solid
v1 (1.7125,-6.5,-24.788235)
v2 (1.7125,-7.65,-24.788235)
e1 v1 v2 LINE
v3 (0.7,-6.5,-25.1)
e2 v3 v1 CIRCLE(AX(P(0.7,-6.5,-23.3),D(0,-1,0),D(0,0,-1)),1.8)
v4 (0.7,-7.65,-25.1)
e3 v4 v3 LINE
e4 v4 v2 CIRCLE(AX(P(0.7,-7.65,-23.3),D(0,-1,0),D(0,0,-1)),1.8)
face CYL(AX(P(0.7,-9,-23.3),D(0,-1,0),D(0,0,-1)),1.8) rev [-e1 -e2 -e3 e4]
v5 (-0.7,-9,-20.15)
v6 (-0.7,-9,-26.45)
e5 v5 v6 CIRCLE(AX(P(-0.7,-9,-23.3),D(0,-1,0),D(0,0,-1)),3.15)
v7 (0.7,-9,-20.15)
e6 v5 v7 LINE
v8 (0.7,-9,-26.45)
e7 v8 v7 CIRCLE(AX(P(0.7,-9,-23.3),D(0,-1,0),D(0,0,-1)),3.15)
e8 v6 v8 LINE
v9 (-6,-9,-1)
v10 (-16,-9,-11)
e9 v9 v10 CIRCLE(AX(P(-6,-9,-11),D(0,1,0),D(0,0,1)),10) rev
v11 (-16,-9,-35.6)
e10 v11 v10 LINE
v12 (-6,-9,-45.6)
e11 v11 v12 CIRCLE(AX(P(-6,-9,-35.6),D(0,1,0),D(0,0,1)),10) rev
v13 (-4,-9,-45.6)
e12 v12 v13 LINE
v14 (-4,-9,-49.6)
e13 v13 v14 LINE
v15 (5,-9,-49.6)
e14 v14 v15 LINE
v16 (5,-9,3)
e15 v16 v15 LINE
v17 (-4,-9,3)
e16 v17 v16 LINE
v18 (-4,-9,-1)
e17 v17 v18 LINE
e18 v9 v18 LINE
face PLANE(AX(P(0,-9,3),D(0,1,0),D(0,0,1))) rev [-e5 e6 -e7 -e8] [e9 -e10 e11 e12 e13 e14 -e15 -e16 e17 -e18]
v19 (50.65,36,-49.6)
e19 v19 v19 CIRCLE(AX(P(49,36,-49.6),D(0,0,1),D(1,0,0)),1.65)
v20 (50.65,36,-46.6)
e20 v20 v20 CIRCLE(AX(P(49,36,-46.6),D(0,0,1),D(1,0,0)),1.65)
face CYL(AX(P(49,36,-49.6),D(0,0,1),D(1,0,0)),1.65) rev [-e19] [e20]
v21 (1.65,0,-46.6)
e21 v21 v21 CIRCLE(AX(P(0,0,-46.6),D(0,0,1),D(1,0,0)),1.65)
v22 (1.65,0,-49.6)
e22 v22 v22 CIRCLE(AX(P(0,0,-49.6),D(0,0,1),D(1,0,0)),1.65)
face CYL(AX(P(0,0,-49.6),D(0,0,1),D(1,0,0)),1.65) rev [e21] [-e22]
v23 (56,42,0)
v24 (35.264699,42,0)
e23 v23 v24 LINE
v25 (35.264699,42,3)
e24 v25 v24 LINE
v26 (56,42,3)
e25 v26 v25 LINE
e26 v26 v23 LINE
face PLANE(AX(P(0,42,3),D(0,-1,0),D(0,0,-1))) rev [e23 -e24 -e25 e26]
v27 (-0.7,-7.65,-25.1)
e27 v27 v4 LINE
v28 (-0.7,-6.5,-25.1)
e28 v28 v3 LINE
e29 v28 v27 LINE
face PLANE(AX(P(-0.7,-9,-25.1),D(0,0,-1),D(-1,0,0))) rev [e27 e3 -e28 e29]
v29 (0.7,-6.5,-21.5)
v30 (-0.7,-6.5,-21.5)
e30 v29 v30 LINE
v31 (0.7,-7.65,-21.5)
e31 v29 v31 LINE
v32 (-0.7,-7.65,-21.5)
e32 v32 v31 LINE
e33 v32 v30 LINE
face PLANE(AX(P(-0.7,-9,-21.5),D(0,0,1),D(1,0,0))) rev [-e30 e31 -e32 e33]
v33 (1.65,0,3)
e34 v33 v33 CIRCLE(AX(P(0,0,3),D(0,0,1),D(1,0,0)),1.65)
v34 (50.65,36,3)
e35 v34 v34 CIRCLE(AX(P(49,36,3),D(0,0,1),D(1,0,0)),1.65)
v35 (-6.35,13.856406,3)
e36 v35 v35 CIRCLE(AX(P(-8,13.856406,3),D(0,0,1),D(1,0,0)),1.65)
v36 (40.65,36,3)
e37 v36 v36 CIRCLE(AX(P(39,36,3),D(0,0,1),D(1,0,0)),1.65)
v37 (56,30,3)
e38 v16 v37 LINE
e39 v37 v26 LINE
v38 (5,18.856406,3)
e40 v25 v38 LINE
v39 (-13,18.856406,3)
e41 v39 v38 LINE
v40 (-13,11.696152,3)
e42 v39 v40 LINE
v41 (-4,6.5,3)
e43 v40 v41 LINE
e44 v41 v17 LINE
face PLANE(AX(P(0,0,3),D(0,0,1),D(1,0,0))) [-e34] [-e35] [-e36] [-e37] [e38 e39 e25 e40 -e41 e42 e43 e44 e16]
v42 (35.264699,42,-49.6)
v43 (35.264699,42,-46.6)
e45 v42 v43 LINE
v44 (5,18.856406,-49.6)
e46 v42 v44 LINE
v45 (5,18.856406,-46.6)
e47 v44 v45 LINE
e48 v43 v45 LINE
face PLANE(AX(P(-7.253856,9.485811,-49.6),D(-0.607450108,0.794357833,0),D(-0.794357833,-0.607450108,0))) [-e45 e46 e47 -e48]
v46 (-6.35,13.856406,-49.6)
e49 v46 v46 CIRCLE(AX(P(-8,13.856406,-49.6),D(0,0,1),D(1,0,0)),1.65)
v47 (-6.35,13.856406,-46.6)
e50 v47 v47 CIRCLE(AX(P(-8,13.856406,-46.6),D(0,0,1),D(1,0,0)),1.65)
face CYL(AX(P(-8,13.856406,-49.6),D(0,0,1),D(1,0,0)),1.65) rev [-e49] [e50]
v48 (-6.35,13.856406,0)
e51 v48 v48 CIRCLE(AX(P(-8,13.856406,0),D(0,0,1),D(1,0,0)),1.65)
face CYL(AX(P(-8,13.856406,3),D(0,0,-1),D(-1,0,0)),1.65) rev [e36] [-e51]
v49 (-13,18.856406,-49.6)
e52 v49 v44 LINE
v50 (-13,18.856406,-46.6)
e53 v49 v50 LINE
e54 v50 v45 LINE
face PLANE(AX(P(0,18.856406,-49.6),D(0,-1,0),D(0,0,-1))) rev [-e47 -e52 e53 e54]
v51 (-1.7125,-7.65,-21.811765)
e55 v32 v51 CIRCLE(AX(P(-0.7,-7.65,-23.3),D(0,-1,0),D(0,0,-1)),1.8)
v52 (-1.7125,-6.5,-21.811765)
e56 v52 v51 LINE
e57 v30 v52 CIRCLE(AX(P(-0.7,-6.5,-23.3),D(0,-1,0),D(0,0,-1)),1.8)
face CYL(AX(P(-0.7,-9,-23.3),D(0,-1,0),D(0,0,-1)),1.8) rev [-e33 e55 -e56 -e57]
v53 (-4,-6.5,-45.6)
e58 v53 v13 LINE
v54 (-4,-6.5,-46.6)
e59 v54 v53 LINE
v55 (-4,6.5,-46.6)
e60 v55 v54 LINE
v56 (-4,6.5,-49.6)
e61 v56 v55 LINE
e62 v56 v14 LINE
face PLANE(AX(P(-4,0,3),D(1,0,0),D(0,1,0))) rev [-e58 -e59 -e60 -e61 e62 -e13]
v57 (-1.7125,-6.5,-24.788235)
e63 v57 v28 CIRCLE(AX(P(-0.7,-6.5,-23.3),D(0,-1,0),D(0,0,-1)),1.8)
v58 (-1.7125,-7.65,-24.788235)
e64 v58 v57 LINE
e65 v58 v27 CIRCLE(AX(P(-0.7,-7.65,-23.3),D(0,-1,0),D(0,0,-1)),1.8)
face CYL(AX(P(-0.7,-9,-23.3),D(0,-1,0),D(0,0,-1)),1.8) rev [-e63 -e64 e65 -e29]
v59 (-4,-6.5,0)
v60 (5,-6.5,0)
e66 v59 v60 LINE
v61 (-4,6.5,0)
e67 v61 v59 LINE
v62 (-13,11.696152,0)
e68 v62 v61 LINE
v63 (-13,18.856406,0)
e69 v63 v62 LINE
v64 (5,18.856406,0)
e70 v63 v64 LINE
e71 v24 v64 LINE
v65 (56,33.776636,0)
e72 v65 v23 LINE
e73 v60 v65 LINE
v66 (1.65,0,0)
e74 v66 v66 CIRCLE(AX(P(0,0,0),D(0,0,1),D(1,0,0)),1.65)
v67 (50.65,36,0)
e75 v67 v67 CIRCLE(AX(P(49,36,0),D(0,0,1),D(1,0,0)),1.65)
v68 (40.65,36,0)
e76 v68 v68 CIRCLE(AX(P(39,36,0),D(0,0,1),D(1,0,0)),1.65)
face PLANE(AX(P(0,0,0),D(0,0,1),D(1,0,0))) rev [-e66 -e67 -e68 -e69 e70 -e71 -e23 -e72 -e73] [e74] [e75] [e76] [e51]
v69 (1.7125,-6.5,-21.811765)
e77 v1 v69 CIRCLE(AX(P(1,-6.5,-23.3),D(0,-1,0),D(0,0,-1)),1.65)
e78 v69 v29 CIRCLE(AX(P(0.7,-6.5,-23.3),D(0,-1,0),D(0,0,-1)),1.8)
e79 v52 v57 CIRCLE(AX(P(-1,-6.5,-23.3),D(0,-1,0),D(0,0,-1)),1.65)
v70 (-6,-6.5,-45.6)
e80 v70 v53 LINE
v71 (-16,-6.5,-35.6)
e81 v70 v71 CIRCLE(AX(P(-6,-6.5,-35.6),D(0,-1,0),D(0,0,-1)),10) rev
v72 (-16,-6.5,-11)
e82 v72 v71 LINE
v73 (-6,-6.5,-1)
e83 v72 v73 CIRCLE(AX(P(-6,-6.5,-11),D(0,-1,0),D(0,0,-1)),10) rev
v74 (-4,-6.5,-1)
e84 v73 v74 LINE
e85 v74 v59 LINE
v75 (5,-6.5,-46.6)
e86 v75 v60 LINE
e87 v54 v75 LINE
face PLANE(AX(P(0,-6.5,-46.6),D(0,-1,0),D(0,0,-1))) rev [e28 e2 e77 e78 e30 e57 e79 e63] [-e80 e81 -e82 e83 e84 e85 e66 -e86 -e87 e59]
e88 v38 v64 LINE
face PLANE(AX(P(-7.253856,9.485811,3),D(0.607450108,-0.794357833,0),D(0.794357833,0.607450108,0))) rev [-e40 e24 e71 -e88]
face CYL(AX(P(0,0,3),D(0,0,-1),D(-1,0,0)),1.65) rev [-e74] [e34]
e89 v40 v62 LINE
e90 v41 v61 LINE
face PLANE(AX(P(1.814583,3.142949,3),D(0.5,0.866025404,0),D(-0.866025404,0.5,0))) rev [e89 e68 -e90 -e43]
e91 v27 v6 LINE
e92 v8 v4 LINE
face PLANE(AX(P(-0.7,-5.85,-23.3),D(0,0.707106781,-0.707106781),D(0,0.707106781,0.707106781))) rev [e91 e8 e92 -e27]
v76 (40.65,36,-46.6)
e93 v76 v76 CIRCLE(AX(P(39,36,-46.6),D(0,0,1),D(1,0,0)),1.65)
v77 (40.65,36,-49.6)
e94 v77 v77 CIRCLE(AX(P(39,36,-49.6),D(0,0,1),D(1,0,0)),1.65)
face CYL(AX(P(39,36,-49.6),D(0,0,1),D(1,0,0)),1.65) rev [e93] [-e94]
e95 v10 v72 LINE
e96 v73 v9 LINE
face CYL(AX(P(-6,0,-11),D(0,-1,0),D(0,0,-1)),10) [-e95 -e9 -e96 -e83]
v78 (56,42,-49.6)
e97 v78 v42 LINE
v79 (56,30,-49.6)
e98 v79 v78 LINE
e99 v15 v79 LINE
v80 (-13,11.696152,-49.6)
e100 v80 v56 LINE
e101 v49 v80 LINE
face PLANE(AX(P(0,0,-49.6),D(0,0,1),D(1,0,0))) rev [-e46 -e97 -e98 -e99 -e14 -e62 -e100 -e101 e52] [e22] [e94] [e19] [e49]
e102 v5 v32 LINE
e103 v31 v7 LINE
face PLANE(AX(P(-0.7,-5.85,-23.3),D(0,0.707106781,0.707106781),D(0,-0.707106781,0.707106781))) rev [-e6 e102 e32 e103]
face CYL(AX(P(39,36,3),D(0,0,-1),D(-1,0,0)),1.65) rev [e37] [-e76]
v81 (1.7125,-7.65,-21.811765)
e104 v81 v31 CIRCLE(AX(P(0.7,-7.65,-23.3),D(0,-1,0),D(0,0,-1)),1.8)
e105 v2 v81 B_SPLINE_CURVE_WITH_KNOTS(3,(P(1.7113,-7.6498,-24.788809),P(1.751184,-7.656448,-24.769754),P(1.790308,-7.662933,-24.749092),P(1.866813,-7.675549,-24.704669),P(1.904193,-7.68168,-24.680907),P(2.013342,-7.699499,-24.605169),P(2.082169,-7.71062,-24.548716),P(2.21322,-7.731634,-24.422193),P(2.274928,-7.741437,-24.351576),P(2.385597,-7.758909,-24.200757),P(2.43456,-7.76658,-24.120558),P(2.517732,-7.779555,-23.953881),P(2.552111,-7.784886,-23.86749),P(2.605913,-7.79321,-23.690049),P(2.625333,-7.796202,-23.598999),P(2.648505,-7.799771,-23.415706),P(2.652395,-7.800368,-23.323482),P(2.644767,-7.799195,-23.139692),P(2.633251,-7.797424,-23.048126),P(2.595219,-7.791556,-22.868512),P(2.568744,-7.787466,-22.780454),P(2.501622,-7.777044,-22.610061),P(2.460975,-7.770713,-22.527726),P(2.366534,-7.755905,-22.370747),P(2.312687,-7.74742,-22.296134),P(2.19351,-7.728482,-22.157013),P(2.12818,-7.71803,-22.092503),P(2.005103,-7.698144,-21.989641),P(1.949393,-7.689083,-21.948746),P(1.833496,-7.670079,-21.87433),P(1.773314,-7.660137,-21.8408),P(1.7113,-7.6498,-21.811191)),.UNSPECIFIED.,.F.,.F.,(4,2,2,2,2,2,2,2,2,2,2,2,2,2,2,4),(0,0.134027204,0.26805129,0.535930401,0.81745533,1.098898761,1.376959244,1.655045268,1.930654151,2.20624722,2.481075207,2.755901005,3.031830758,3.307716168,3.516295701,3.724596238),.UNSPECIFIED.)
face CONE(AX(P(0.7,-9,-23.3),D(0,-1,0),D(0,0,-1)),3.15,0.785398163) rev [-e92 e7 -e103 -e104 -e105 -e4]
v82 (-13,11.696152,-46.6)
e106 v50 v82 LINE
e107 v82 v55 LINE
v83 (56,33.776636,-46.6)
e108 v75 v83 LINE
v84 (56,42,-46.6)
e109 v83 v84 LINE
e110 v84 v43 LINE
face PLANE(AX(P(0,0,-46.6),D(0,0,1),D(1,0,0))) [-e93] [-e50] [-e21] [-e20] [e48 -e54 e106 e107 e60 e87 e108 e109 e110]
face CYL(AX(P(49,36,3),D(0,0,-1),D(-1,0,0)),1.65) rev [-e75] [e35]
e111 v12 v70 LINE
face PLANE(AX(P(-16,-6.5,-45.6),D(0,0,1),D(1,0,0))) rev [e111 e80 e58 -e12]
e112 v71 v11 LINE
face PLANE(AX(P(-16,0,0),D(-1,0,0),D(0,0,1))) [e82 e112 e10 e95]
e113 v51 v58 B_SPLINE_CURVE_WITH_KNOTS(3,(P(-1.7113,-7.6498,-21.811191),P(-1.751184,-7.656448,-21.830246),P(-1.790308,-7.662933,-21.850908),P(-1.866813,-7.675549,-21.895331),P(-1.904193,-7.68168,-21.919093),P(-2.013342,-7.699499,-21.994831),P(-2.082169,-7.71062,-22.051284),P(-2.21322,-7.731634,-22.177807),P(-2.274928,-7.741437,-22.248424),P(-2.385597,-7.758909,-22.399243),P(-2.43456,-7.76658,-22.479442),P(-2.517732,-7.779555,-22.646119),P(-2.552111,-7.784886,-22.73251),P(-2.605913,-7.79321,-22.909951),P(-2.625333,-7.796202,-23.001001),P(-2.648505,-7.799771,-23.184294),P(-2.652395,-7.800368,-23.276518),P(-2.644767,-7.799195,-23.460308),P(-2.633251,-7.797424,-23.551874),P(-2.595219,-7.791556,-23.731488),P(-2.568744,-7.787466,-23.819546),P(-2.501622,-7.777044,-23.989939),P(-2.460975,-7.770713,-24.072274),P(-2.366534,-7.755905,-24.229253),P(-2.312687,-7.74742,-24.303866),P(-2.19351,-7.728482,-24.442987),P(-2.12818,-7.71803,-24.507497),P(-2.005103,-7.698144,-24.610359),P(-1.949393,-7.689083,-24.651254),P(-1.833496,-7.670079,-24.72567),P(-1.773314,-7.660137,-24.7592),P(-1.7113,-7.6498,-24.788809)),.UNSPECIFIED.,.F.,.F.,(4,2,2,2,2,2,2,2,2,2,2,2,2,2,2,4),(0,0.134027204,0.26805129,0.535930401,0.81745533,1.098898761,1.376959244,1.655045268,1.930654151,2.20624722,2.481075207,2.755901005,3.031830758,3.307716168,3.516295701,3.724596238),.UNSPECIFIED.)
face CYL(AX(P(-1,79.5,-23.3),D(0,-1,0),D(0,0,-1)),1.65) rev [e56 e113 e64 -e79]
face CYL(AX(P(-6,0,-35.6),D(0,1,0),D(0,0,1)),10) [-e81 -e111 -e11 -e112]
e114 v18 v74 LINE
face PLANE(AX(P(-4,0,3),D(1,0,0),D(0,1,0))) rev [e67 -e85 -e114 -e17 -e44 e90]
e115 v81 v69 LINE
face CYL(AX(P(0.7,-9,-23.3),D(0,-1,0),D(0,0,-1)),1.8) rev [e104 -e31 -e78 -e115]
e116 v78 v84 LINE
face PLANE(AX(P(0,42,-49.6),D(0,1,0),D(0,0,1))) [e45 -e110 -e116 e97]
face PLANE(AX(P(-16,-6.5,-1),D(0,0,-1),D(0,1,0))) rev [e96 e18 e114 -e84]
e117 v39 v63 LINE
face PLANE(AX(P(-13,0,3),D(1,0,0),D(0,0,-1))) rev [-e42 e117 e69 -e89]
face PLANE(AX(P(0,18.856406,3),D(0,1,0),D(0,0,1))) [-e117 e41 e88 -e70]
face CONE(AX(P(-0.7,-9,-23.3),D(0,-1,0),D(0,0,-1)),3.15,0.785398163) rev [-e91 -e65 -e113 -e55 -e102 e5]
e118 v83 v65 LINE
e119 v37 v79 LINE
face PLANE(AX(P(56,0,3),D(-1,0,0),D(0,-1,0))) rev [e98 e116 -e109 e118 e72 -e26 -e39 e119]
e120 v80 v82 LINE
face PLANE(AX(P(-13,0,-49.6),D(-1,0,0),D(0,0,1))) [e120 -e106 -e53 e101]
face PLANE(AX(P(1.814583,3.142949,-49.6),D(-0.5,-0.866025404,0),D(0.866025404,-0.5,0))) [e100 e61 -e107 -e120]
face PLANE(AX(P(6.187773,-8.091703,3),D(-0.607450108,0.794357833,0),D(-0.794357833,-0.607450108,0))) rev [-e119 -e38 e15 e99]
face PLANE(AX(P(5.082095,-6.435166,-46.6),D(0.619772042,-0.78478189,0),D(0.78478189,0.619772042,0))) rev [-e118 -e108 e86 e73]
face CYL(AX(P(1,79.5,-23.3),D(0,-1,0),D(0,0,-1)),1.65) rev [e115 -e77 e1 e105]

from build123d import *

# Parameters (mm, degrees)
SKETCH1_R                                      = 1.65
BOSS_EXTRUDE1_DEPTH                            = 3
SKETCH1_3_W                                    = 9
SKETCH1_3_H                                    = 2.5
BOSS_EXTRUDE2_DEPTH                            = 46.6
BOSS_EXTRUDE3_START                            = -49.6
SKETCH1_4_R                                    = 1.65
SKETCH1_4_W                                    = 9
SKETCH1_4_H                                    = 2.5
BOSS_EXTRUDE3_DEPTH                            = 3
CUT_EXTRUDE1_DEPTH                             = 88.5
SKETCH3_W                                      = 44.6
SKETCH3_H                                      = 2.5
BOSS_EXTRUDE4_DEPTH                            = 12
FILLET1_R                                      = 10
CSK_START                                      = -9
CSK_SLOT_FOR_M3_COUNTERSUNK_FLAT_HEAD_SC_DEPTH = 3


with BuildPart() as part:
    # Sketch1 → Boss-Extrude1 (new body)
    with BuildSketch(Plane.XY):
        Polygon((-13, 18.856406461), (-13, 11.696152423), (-4, 6.5), (-4, -9), (5, -9), (56, 30), (56, 42), (35.264699244, 42), (5, 18.856406461), align=None)
        Circle(SKETCH1_R, mode=Mode.SUBTRACT)
        with Locations((-8, 13.856406461)):
            Circle(SKETCH1_R, mode=Mode.SUBTRACT)
        with Locations((49, 36)):
            Circle(SKETCH1_R, mode=Mode.SUBTRACT)
        with Locations((39, 36)):
            Circle(SKETCH1_R, mode=Mode.SUBTRACT)
    extrude(amount=BOSS_EXTRUDE1_DEPTH)

    # Sketch1<3> → Boss-Extrude2 (add)
    with BuildSketch(Plane.XY):
        with Locations((0.5, -7.75)):
            Rectangle(SKETCH1_3_W, SKETCH1_3_H)
        Polygon((56, 33.77663551), (5, -6.5), (5, -9), (56, 30), align=None)
    extrude(amount=-BOSS_EXTRUDE2_DEPTH)

    # Sketch1<4> → Boss-Extrude3 (add)
    # profile 1 of 4: a face of its own
    with BuildSketch(Plane.XY.offset(BOSS_EXTRUDE3_START)):
        Polygon((5, 18.856406461), (-13, 18.856406461), (-13, 11.696152423), (-4, 6.5), (-4, -6.5), (5, -6.5), align=None)
        Circle(SKETCH1_4_R, mode=Mode.SUBTRACT)
        with Locations((-8, 13.856406461)):
            Circle(SKETCH1_4_R, mode=Mode.SUBTRACT)
    # profile 2 of 4: a face of its own
    with BuildSketch(Plane.XY.offset(BOSS_EXTRUDE3_START)):
        with Locations((0.5, -7.75)):
            Rectangle(SKETCH1_4_W, SKETCH1_4_H)
    # profile 3 of 4: a face of its own
    with BuildSketch(Plane.XY.offset(BOSS_EXTRUDE3_START)):
        Polygon((56, 33.77663551), (5, -6.5), (5, -9), (56, 30), align=None)
    # profile 4 of 4: a face of its own
    with BuildSketch(Plane.XY.offset(BOSS_EXTRUDE3_START)):
        Polygon((35.264699244, 42), (5, 18.856406461), (5, -6.5), (56, 33.77663551), (56, 42), align=None)
        with Locations((39, 36)):
            Circle(SKETCH1_4_R, mode=Mode.SUBTRACT)
        with Locations((49, 36)):
            Circle(SKETCH1_4_R, mode=Mode.SUBTRACT)
    extrude(amount=BOSS_EXTRUDE3_DEPTH)

    # Sketch2 → Cut-Extrude1 (cut)
    with BuildSketch(Plane.XZ.offset(9)):
        with BuildLine():
            Line((1, -24.95), (-1, -24.95))
            ThreePointArc((-1, -24.95), (-2.65, -23.3), (-1, -21.65))
            Line((-1, -21.65), (1, -21.65))
            ThreePointArc((1, -21.65), (2.65, -23.3), (1, -24.95))
        make_face()
    extrude(amount=-CUT_EXTRUDE1_DEPTH, mode=Mode.SUBTRACT)

    # Sketch3 → Boss-Extrude4 (add)
    with BuildSketch(Plane.ZY.offset(4)):
        with Locations((-23.3, -7.75)):
            Rectangle(SKETCH3_W, SKETCH3_H)
    extrude(amount=BOSS_EXTRUDE4_DEPTH)

    # Fillet1
    fillet1_edges = [part.edges().sort_by_distance(p)[0] for p in [
        (-16, -7.75, -45.6),
        (-16, -7.75, -1),
    ]]
    fillet(fillet1_edges, radius=FILLET1_R)

    # CSK SLOT for M3 Countersunk Flat Head Screw1: read off the stored shape, not the designer's step
    # CSK SLOT for M3 Countersunk Flat Hea 2 → CSK SLOT for M3 Countersunk Flat Head Screw1 (cut)
    with BuildSketch(Plane(origin=(0, 0, 0), x_dir=(1, 0, 0), z_dir=(0, 1, 0)).offset(CSK_START)):
        with BuildLine():
            ThreePointArc((1.7125, 24.788235112), (1.229705955, 25.020294045), (0.7, 25.1))
            Line((0.7, 25.1), (-0.7, 25.1))
            ThreePointArc((-0.7, 25.1), (-1.229705955, 25.020294045), (-1.7125, 24.788235112))
            ThreePointArc((-1.7125, 24.788235112), (-1.365316345, 24.909050642), (-1, 24.95))
            Line((-1, 24.95), (1, 24.95))
            ThreePointArc((1, 24.95), (1.365316345, 24.909050642), (1.7125, 24.788235112))
        make_face()
        with BuildLine():
            ThreePointArc((0.7, 21.5), (1.229705955, 21.579705955), (1.7125, 21.811764888))
            ThreePointArc((1.7125, 21.811764888), (1.365316345, 21.690949358), (1, 21.65))
            Line((1, 21.65), (-1, 21.65))
            ThreePointArc((-1, 21.65), (-1.365316345, 21.690949358), (-1.7125, 21.811764888))
            ThreePointArc((-1.7125, 21.811764888), (-1.229705955, 21.579705955), (-0.7, 21.5))
            Line((-0.7, 21.5), (0.7, 21.5))
        make_face()
    extrude(amount=CSK_SLOT_FOR_M3_COUNTERSUNK_FLAT_HEAD_SC_DEPTH, mode=Mode.SUBTRACT)

    # CSK SLOT for M3 Countersunk Flat Hea 3: loft between two sections, ruled curve by curve
    csk_slot_for_m3_countersunk_flat_hea_3_from = [
        Edge.make_three_point_arc((0.7, -7.649999999, -25.099999999), (1.972792205, -7.649999999, -24.572792205), (2.499999999, -7.649999999, -23.3)),
        Edge.make_three_point_arc((2.499999999, -7.649999999, -23.3), (1.972792205, -7.649999999, -22.027207795), (0.7, -7.649999999, -21.500000001)),
        Edge.make_three_point_arc((-0.7, -7.649999999, -21.500000001), (-1.972792205, -7.649999999, -22.027207795), (-2.499999999, -7.649999999, -23.3)),
        Edge.make_three_point_arc((-2.499999999, -7.649999999, -23.3), (-1.972792205, -7.649999999, -24.572792205), (-0.7, -7.649999999, -25.099999999)),
        Edge.make_line((0.7, -7.649999999, -21.500000001), (-0.7, -7.649999999, -21.500000001)),
        Edge.make_line((0.7, -7.649999999, -25.099999999), (-0.7, -7.649999999, -25.099999999)),
    ]
    csk_slot_for_m3_countersunk_flat_hea_3_to = [
        Edge.make_three_point_arc((0.7, -9, -26.45), (2.927386361, -9, -25.527386361), (3.85, -9, -23.3)),
        Edge.make_three_point_arc((3.85, -9, -23.3), (2.927386361, -9, -21.072613639), (0.7, -9, -20.15)),
        Edge.make_three_point_arc((-0.7, -9, -20.15), (-2.927386361, -9, -21.072613639), (-3.85, -9, -23.3)),
        Edge.make_three_point_arc((-3.85, -9, -23.3), (-2.927386361, -9, -25.527386361), (-0.7, -9, -26.45)),
        Edge.make_line((0.7, -9, -20.15), (-0.7, -9, -20.15)),
        Edge.make_line((0.7, -9, -26.45), (-0.7, -9, -26.45)),
    ]
    csk_slot_for_m3_countersunk_flat_hea_3 = Solid(Shell([*[Face.make_surface_from_curves(csk_slot_for_m3_countersunk_flat_hea_3_from[k], csk_slot_for_m3_countersunk_flat_hea_3_to[k]) for k in range(6)], Face(Wire(csk_slot_for_m3_countersunk_flat_hea_3_from)), Face(Wire(csk_slot_for_m3_countersunk_flat_hea_3_to))]))
    add(csk_slot_for_m3_countersunk_flat_hea_3, mode=Mode.SUBTRACT)


solid = part.part
